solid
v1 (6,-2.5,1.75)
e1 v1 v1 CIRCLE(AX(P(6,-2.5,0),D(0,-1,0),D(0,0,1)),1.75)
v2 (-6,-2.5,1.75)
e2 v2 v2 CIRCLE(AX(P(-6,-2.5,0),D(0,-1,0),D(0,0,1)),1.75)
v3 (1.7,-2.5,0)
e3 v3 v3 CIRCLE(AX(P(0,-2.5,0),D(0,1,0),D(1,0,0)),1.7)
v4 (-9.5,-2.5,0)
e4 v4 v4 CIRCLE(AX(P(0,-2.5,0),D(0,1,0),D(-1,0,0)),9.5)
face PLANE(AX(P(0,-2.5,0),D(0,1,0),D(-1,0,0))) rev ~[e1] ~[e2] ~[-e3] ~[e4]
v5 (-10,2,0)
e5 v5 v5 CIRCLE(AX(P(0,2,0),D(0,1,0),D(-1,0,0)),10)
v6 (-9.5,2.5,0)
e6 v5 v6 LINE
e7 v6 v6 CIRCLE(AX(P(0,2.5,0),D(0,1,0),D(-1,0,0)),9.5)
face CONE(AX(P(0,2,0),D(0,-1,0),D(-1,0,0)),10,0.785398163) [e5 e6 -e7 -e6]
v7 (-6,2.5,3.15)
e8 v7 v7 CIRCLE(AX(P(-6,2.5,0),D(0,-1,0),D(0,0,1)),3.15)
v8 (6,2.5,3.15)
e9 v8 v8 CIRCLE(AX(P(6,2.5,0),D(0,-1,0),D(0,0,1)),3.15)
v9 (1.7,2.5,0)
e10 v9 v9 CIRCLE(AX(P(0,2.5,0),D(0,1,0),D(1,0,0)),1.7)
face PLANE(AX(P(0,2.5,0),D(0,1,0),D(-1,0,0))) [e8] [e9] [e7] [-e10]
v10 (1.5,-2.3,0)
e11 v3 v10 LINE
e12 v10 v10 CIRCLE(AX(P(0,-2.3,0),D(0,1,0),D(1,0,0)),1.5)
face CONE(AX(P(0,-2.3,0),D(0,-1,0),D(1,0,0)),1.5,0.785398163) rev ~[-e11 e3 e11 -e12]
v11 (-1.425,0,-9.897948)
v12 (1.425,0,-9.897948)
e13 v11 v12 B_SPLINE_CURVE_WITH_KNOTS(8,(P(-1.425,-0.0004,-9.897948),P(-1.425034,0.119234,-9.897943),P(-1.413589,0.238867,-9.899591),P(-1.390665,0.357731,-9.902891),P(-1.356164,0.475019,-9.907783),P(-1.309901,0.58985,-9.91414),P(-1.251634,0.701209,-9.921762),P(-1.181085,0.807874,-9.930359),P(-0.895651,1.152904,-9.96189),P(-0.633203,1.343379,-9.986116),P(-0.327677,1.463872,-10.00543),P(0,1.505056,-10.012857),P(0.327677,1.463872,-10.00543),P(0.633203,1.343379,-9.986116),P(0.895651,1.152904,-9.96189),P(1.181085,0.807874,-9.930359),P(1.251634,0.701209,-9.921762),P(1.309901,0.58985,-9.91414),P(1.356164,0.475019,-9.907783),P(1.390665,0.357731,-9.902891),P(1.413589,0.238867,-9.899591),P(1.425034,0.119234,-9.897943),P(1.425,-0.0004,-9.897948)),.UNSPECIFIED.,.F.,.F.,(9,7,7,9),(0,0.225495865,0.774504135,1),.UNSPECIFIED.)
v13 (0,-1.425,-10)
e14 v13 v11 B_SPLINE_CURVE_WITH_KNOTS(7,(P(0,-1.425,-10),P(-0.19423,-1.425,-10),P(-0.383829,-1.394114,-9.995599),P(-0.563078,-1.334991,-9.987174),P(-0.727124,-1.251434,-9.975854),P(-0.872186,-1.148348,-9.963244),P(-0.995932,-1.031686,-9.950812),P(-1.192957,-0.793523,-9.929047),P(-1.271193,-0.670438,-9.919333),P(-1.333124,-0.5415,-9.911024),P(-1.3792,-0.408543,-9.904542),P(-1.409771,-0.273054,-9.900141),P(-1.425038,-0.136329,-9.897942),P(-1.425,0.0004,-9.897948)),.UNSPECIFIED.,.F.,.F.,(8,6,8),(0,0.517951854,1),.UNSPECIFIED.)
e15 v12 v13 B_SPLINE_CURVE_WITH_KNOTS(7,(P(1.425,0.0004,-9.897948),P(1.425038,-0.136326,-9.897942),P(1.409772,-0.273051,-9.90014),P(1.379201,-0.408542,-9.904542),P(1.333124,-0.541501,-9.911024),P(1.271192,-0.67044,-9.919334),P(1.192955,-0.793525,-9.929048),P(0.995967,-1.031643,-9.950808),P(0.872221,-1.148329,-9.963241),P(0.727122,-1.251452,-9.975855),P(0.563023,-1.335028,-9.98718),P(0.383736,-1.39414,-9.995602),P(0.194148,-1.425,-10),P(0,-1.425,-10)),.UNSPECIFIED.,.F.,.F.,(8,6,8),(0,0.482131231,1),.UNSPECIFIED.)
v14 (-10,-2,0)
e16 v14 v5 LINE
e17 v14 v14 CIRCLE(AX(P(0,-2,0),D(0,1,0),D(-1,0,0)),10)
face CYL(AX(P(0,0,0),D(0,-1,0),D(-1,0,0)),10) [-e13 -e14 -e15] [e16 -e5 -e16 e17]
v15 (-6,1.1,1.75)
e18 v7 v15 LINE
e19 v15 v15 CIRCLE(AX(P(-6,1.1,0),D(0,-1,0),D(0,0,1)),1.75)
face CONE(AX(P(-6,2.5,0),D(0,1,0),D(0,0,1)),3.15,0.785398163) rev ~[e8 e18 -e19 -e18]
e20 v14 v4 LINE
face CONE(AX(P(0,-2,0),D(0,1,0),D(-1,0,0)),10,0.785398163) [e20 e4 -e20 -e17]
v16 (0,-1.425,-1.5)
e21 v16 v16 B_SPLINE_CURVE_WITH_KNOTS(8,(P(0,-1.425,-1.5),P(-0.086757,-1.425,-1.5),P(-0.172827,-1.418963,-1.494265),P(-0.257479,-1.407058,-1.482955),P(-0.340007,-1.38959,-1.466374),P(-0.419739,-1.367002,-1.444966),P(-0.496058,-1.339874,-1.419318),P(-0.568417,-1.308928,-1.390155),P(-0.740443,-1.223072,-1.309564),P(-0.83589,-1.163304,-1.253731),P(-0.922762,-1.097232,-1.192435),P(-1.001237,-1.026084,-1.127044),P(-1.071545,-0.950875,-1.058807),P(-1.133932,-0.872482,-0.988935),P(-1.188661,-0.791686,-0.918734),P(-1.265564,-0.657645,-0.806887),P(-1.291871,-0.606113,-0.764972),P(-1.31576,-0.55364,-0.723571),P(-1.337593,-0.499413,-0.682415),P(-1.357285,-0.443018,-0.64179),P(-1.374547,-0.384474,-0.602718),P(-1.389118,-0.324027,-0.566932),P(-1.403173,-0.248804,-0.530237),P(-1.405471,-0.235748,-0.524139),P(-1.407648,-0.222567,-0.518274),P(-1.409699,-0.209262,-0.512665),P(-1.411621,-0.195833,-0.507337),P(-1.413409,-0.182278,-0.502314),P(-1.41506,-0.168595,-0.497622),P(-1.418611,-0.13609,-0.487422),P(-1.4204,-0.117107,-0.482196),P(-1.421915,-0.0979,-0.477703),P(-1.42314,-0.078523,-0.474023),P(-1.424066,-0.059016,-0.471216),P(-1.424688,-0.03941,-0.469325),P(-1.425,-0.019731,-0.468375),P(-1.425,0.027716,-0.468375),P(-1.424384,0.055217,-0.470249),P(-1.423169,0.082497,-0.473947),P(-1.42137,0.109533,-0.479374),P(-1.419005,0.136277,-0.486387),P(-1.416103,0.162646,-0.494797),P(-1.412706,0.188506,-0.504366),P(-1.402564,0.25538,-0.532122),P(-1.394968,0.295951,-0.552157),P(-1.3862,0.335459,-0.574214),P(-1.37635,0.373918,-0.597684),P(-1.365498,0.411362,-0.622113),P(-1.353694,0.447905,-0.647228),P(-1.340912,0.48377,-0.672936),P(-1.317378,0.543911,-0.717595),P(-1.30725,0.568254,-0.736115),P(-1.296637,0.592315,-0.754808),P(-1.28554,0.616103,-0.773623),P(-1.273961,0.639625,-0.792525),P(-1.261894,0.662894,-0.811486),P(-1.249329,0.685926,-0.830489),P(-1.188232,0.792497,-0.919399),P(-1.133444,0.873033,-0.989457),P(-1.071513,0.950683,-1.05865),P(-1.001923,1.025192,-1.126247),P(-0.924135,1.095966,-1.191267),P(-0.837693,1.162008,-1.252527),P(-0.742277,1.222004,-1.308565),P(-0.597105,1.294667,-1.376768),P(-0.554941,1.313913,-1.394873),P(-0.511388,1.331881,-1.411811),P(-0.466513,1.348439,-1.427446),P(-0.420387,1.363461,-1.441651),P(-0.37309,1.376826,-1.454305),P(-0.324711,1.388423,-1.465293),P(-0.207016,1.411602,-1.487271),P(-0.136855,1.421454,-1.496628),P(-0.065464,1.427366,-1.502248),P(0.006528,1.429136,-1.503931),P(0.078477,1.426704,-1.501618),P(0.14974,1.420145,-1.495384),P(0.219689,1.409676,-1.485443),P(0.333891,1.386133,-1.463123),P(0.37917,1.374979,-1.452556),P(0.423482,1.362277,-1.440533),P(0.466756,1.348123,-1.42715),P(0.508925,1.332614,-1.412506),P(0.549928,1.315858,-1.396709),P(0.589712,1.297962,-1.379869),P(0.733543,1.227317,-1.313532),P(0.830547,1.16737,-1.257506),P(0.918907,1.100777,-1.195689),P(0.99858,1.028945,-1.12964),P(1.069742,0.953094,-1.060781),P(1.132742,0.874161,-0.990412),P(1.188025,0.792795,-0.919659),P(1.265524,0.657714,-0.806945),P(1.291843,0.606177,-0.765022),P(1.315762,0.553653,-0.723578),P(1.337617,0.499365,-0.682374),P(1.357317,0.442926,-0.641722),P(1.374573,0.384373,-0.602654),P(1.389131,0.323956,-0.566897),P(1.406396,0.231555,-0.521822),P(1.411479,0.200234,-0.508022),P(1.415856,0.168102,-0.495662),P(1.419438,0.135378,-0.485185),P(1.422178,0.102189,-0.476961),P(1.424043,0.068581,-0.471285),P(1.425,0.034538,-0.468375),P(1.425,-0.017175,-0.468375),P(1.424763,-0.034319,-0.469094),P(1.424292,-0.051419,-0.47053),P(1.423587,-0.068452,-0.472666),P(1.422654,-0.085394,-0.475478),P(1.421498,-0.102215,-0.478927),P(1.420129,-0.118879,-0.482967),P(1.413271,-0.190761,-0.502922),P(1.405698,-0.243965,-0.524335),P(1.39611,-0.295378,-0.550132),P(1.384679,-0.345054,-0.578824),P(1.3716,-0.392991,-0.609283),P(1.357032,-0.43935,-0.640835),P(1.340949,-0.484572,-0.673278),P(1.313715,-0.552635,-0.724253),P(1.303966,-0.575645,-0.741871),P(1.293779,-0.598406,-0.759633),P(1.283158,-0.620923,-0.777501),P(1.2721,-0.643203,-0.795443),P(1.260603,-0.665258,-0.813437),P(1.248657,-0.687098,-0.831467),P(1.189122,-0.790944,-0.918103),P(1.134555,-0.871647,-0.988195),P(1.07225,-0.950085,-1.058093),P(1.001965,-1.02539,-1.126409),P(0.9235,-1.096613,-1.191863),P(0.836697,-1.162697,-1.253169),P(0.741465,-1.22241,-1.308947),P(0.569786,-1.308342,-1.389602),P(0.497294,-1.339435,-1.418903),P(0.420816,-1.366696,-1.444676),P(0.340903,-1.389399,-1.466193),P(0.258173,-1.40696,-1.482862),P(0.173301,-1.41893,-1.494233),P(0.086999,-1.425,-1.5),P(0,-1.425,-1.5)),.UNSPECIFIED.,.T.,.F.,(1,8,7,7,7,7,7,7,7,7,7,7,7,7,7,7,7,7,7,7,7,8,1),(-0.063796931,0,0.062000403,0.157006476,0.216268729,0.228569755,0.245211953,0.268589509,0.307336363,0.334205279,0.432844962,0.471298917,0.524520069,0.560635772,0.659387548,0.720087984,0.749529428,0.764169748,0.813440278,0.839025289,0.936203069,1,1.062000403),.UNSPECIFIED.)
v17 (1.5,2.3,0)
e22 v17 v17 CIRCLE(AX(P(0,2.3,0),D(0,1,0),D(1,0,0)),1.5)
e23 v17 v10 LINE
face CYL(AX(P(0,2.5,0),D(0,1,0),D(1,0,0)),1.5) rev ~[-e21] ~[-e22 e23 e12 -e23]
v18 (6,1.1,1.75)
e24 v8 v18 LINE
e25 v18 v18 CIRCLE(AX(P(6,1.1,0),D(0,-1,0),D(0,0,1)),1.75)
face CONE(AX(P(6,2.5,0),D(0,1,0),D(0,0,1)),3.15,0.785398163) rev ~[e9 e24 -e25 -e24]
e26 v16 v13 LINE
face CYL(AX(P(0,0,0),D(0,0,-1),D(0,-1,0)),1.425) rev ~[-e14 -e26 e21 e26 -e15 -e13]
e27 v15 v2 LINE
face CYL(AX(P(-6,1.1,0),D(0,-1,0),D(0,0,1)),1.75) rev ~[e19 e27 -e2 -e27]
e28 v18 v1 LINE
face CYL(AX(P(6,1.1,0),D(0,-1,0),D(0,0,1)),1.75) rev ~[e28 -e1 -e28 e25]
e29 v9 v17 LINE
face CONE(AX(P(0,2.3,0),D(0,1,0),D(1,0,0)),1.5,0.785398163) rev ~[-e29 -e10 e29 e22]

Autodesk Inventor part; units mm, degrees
ref_plane "YZ Plane" through (0, 0, 0) normal (1, 0, 0) x (0, 1, 0)
ref_plane "XZ Plane" through (0, 0, 0) normal (0, 1, 0) x (-1, 0, 0)
ref_plane "XY Plane" through (0, 0, 0) normal (0, 0, 1) x (1, 0, 0)
sketch "Sketch4" plane through (0, 0, 0) normal (0, 1, 0) x (-1, 0, 0)
  circle A0 centre (0, 0) radius 10
extrude "Extrusion2" add sketch "Sketch4" along normal mid plane 5
sketch "Sketch8" plane through (0, 2.5, 0) normal (0, 1, 0) x (1, 0, 0)
  point P0 (0, 0)
  point P1 (-6, 0)
  point P2 (6, 0)
  dimension "d63" = 6
  dimension "d64" = 12
hole "Hole5" at (-6, 2.5, 0) at (6, 2.5, 0) direction (0, -1, 0) diameter 3.5 depth 22.2 countersink diameter 6.3 countersink angle 90
sketch "Sketch9" plane through (0, 2.5, 0) normal (0, 1, 0) x (1, 0, 0)
  line L0 (-1.5, 1.5) -> (1.5, 1.5) construction
  line L1 (1.5, 1.5) -> (1.5, -1.5) construction
  line L2 (1.5, -1.5) -> (-1.5, -1.5) construction
  line L3 (-1.5, -1.5) -> (-1.5, 1.5) construction
  line L4 (-1.5, 1.5) -> (1.5, -1.5) construction
  line L5 (1.5, 1.5) -> (-1.5, -1.5) construction
  circle A0 centre (0, 0) radius 1.5
  dimension "d72" = 3
  dimension "d73" = 3
  dimension "d86" = 3
extrude "Extrusion5" cut sketch "Sketch9" against normal blind 10
sketch "Sketch10" plane through (-1.5, 2.5, 0) normal (0, 0, 1) x (1, 0, 0)
  point P0 (1.5, -2.5)
  point P1 (1.5, -2.5)
hole "Hole6" at (0, 0, 0) direction (0, 0, -1) diameter 2.85 depth 10.4 thread size "M3.5x0.6" class "6H" standard "ISO Metric profile"
chamfer "Chamfer1" distance 0.5 angle 45 2 edges at (10, 2.5, 0) (10, -2.5, 0)
chamfer "Chamfer2" distance 0.2 angle 45 2 edges at (-1.5, 2.5, 0) (-1.5, -2.5, 0)
equation "\"d73\" = d72"
properties part number "Wheel Mounting Cap" material "Mild Steel S355 J2"
